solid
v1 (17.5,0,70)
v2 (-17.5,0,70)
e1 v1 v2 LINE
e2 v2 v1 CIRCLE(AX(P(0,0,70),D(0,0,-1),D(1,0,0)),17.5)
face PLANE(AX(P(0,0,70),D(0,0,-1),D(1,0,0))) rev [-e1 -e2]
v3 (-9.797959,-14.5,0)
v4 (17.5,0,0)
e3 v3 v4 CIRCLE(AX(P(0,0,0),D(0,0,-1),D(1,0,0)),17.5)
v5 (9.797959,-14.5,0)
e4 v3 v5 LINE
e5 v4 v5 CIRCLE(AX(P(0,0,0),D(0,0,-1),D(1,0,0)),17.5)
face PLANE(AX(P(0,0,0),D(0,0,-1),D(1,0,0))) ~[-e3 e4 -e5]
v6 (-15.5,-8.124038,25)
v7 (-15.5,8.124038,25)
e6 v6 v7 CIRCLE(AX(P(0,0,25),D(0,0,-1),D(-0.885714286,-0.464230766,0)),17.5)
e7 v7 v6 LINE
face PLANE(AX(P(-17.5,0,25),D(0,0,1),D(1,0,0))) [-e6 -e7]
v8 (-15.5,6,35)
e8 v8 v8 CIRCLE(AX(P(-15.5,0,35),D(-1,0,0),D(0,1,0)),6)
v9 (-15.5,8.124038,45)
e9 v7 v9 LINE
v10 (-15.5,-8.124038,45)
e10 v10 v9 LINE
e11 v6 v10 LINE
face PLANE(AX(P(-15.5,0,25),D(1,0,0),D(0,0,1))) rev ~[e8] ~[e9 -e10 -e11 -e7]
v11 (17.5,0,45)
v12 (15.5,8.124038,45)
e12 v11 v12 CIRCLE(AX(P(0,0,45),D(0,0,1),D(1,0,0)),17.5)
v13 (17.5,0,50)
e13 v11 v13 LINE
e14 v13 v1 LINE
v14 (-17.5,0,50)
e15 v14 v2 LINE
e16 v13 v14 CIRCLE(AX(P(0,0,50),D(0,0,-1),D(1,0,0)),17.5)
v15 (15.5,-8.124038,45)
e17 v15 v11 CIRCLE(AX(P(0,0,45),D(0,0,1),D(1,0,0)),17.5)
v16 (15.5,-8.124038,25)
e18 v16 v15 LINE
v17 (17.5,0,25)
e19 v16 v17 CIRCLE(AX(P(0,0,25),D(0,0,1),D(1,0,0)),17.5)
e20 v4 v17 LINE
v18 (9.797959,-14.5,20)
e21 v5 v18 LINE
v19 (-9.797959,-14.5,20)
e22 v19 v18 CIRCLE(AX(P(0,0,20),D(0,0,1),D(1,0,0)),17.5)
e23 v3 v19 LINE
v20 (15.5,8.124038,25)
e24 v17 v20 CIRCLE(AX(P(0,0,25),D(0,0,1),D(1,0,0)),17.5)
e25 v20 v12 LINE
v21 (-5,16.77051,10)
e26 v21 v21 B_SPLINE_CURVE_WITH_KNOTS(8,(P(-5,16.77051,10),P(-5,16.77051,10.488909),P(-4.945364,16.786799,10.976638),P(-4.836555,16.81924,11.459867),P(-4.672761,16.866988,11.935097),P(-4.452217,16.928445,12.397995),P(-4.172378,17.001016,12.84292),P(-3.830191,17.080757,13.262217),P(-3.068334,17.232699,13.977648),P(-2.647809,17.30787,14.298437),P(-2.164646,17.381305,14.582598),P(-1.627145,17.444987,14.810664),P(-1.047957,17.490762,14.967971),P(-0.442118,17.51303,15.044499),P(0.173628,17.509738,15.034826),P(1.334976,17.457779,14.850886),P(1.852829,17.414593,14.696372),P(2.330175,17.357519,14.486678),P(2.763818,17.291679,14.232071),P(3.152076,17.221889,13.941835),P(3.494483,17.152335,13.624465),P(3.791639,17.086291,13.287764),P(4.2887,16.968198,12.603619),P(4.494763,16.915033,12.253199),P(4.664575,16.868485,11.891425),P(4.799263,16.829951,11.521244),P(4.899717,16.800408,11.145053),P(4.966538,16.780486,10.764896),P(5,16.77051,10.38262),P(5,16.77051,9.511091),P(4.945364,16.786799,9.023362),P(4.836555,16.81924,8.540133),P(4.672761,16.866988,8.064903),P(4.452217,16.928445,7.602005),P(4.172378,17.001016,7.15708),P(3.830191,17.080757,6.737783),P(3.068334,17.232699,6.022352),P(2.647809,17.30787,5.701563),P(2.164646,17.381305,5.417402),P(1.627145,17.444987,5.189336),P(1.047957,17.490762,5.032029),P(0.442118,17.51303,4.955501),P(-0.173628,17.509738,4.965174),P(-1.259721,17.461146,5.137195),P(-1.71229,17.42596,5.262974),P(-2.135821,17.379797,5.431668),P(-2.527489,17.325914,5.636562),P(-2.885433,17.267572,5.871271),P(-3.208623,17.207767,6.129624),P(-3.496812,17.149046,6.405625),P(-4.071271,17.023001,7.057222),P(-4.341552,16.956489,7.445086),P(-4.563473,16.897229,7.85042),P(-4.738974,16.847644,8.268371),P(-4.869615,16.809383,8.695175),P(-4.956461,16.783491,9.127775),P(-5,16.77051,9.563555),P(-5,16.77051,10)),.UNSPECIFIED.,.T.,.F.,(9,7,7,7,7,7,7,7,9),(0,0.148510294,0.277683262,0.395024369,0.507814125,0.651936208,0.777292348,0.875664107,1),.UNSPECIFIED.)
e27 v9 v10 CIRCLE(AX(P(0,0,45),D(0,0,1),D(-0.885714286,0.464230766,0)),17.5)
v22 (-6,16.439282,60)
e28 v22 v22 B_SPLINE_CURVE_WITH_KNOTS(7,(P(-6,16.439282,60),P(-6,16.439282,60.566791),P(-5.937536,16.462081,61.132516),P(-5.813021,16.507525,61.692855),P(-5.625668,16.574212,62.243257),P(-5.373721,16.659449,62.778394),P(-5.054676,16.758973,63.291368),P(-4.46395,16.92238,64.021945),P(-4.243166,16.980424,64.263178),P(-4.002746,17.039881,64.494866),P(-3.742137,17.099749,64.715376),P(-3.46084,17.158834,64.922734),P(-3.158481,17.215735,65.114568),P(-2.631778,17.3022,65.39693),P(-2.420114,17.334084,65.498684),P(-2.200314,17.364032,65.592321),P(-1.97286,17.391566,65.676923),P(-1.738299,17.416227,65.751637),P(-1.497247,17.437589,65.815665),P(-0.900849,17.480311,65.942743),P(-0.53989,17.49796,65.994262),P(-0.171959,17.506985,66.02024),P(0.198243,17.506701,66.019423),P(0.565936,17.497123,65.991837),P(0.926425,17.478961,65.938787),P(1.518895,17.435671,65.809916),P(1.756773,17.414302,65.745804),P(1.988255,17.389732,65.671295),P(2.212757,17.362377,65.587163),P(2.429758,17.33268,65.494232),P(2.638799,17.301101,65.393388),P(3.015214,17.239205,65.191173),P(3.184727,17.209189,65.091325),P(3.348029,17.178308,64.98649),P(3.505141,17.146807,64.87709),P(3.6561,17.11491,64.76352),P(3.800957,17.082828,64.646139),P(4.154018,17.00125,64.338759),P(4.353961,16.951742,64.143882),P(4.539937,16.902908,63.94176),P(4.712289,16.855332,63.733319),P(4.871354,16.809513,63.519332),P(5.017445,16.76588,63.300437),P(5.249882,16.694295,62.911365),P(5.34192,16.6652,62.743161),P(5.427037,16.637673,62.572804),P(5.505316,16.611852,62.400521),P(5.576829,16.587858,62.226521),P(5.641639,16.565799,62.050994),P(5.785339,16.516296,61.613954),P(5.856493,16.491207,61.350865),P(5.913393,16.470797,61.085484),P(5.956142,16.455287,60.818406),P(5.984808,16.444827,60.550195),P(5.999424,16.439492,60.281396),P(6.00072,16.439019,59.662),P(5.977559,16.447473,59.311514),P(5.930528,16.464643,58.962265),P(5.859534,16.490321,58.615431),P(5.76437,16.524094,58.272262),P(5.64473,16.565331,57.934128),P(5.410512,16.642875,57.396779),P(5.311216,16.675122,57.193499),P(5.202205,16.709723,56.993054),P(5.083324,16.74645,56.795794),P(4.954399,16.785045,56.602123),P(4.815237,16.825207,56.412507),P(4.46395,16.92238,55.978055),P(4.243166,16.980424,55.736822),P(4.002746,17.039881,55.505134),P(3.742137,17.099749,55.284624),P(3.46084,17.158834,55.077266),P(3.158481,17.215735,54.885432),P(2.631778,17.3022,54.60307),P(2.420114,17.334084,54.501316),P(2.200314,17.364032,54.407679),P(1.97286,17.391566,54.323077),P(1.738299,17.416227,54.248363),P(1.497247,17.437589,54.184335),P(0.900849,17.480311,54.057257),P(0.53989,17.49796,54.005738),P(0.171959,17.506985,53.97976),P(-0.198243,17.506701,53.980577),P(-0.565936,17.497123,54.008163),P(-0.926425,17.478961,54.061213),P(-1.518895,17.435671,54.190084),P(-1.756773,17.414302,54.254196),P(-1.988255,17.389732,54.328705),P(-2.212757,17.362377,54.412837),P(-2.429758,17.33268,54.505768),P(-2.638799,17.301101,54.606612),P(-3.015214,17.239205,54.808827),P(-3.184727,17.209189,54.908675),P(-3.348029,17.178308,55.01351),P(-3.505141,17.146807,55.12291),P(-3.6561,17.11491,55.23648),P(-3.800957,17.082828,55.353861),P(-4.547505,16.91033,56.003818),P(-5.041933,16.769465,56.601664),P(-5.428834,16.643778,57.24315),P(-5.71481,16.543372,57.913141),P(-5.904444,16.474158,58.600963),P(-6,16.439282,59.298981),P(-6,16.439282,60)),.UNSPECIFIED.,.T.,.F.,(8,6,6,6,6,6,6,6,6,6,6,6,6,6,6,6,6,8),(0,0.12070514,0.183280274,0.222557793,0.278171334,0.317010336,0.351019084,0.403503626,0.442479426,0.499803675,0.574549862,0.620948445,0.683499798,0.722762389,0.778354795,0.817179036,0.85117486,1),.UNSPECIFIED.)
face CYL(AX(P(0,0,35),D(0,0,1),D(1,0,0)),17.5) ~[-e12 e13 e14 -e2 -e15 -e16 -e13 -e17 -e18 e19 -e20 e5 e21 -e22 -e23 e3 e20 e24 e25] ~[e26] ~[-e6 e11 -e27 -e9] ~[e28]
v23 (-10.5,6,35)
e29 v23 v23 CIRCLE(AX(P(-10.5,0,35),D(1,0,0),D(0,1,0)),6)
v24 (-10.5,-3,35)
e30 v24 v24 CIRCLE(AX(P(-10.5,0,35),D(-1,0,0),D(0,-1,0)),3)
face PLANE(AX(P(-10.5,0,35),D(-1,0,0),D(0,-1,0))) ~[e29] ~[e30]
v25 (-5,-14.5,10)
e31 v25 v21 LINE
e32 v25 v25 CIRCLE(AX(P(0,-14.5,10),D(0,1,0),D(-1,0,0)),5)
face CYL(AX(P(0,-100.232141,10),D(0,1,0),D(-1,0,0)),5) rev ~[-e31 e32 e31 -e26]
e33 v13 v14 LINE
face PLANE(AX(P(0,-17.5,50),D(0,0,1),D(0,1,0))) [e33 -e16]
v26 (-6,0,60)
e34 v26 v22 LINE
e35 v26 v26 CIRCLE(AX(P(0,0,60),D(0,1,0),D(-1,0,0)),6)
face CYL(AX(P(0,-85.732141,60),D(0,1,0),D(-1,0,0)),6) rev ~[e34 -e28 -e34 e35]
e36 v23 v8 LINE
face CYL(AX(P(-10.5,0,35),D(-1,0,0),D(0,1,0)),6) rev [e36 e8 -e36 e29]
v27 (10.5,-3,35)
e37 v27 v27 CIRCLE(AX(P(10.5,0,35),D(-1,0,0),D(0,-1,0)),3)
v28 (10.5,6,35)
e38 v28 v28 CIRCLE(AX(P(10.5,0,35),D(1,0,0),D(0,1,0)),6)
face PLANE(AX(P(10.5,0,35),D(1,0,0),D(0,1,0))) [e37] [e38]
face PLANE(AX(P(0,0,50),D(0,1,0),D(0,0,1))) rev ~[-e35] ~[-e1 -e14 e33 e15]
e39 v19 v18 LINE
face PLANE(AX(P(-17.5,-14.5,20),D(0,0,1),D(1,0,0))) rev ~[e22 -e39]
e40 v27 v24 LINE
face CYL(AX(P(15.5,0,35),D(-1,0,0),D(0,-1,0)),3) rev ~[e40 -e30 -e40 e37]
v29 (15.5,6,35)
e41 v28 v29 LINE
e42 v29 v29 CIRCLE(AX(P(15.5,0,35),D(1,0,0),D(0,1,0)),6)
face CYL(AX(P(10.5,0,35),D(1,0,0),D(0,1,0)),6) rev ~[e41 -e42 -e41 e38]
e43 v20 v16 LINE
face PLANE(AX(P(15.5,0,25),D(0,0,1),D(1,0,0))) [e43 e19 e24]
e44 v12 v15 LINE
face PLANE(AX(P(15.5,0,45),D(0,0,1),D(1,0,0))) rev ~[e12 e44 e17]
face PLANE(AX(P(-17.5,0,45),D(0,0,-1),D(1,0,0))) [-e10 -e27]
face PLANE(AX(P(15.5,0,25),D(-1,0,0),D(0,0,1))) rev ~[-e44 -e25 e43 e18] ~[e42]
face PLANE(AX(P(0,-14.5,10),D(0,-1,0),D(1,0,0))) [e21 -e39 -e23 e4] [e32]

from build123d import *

# Parameters (mm, degrees)
F0_W            = 17.5
F0_H            = 70
F2_W            = 17.5
F2_H            = 20
F3_DEPTH        = 17.501
F3_DEPTH_BACK   = 17.501
F5_D            = 12
F7_START        = 14.5
F6_W            = 35
F6_H            = 20
F7_DEPTH        = 3.0010001
F9_D            = 10
F10_W           = 2
F10_H           = 20
F11_DEPTH       = 17.5010001
F11_DEPTH_BACK  = 17.5010001
F13_D           = 6
F13_CBORE_D     = 12
F13_CBORE_DEPTH = 5


# Not quite as in the source:
# - a pattern or mirror of a feature is missing from the dataset's text; its kind, count and spacing are read off the source's solid


with BuildPart() as f1:
    # F0 (on Front) → F1 (revolve)
    with BuildSketch(Plane.XZ):
        with Locations((8.75, 35)):
            Rectangle(F0_W, F0_H)
    revolve(axis=Axis((0, 0, 35), (0, 0, -1)))

    # F2 (on Right) → F3 (cut, two sides)
    with BuildSketch(Plane.YZ) as f3_sk:
        with Locations((-8.75, 60)):
            Rectangle(F2_W, F2_H)
    extrude(amount=-F3_DEPTH, mode=Mode.SUBTRACT)
    extrude(f3_sk.sketch, amount=F3_DEPTH_BACK, mode=Mode.SUBTRACT)

    # F5 (through all)
    with Locations(Plane.XZ):
        with Locations((0, 60)):
            Hole(F5_D / 2)

    # F6 (on Front) → F7 (cut)
    with BuildSketch(Plane.XZ.offset(F7_START)):
        with Locations((0, 10)):
            Rectangle(F6_W, F6_H)
    extrude(amount=F7_DEPTH, mode=Mode.SUBTRACT)

    # F9 (through all)
    with Locations(Plane.XZ.offset(14.5)):
        with Locations((0, 10)):
            Hole(F9_D / 2)

    # F10 (on Front) → F11 (cut, two sides)
    with BuildSketch(Plane.XZ) as f11_sk:
        with Locations((-16.5, 35)):
            Rectangle(F10_W, F10_H)
        with Locations((16.5, 35)):
            Rectangle(F10_W, F10_H)
    extrude(amount=-F11_DEPTH, mode=Mode.SUBTRACT)
    extrude(f11_sk.sketch, amount=F11_DEPTH_BACK, mode=Mode.SUBTRACT)

    # F13 (through all)
    with Locations(Plane.YZ.offset(15.5)):
        with Locations((0, 35)):
            f13 = CounterBoreHole(F13_D / 2, F13_CBORE_D / 2, F13_CBORE_DEPTH)

    # F13_copies: F13 across plane
    add(f13.mirror(Plane(origin=(0, 0, 0), x_dir=(0, 0, -1), z_dir=(-1, 0, 0))), mode=Mode.SUBTRACT)


solid = f1.part
